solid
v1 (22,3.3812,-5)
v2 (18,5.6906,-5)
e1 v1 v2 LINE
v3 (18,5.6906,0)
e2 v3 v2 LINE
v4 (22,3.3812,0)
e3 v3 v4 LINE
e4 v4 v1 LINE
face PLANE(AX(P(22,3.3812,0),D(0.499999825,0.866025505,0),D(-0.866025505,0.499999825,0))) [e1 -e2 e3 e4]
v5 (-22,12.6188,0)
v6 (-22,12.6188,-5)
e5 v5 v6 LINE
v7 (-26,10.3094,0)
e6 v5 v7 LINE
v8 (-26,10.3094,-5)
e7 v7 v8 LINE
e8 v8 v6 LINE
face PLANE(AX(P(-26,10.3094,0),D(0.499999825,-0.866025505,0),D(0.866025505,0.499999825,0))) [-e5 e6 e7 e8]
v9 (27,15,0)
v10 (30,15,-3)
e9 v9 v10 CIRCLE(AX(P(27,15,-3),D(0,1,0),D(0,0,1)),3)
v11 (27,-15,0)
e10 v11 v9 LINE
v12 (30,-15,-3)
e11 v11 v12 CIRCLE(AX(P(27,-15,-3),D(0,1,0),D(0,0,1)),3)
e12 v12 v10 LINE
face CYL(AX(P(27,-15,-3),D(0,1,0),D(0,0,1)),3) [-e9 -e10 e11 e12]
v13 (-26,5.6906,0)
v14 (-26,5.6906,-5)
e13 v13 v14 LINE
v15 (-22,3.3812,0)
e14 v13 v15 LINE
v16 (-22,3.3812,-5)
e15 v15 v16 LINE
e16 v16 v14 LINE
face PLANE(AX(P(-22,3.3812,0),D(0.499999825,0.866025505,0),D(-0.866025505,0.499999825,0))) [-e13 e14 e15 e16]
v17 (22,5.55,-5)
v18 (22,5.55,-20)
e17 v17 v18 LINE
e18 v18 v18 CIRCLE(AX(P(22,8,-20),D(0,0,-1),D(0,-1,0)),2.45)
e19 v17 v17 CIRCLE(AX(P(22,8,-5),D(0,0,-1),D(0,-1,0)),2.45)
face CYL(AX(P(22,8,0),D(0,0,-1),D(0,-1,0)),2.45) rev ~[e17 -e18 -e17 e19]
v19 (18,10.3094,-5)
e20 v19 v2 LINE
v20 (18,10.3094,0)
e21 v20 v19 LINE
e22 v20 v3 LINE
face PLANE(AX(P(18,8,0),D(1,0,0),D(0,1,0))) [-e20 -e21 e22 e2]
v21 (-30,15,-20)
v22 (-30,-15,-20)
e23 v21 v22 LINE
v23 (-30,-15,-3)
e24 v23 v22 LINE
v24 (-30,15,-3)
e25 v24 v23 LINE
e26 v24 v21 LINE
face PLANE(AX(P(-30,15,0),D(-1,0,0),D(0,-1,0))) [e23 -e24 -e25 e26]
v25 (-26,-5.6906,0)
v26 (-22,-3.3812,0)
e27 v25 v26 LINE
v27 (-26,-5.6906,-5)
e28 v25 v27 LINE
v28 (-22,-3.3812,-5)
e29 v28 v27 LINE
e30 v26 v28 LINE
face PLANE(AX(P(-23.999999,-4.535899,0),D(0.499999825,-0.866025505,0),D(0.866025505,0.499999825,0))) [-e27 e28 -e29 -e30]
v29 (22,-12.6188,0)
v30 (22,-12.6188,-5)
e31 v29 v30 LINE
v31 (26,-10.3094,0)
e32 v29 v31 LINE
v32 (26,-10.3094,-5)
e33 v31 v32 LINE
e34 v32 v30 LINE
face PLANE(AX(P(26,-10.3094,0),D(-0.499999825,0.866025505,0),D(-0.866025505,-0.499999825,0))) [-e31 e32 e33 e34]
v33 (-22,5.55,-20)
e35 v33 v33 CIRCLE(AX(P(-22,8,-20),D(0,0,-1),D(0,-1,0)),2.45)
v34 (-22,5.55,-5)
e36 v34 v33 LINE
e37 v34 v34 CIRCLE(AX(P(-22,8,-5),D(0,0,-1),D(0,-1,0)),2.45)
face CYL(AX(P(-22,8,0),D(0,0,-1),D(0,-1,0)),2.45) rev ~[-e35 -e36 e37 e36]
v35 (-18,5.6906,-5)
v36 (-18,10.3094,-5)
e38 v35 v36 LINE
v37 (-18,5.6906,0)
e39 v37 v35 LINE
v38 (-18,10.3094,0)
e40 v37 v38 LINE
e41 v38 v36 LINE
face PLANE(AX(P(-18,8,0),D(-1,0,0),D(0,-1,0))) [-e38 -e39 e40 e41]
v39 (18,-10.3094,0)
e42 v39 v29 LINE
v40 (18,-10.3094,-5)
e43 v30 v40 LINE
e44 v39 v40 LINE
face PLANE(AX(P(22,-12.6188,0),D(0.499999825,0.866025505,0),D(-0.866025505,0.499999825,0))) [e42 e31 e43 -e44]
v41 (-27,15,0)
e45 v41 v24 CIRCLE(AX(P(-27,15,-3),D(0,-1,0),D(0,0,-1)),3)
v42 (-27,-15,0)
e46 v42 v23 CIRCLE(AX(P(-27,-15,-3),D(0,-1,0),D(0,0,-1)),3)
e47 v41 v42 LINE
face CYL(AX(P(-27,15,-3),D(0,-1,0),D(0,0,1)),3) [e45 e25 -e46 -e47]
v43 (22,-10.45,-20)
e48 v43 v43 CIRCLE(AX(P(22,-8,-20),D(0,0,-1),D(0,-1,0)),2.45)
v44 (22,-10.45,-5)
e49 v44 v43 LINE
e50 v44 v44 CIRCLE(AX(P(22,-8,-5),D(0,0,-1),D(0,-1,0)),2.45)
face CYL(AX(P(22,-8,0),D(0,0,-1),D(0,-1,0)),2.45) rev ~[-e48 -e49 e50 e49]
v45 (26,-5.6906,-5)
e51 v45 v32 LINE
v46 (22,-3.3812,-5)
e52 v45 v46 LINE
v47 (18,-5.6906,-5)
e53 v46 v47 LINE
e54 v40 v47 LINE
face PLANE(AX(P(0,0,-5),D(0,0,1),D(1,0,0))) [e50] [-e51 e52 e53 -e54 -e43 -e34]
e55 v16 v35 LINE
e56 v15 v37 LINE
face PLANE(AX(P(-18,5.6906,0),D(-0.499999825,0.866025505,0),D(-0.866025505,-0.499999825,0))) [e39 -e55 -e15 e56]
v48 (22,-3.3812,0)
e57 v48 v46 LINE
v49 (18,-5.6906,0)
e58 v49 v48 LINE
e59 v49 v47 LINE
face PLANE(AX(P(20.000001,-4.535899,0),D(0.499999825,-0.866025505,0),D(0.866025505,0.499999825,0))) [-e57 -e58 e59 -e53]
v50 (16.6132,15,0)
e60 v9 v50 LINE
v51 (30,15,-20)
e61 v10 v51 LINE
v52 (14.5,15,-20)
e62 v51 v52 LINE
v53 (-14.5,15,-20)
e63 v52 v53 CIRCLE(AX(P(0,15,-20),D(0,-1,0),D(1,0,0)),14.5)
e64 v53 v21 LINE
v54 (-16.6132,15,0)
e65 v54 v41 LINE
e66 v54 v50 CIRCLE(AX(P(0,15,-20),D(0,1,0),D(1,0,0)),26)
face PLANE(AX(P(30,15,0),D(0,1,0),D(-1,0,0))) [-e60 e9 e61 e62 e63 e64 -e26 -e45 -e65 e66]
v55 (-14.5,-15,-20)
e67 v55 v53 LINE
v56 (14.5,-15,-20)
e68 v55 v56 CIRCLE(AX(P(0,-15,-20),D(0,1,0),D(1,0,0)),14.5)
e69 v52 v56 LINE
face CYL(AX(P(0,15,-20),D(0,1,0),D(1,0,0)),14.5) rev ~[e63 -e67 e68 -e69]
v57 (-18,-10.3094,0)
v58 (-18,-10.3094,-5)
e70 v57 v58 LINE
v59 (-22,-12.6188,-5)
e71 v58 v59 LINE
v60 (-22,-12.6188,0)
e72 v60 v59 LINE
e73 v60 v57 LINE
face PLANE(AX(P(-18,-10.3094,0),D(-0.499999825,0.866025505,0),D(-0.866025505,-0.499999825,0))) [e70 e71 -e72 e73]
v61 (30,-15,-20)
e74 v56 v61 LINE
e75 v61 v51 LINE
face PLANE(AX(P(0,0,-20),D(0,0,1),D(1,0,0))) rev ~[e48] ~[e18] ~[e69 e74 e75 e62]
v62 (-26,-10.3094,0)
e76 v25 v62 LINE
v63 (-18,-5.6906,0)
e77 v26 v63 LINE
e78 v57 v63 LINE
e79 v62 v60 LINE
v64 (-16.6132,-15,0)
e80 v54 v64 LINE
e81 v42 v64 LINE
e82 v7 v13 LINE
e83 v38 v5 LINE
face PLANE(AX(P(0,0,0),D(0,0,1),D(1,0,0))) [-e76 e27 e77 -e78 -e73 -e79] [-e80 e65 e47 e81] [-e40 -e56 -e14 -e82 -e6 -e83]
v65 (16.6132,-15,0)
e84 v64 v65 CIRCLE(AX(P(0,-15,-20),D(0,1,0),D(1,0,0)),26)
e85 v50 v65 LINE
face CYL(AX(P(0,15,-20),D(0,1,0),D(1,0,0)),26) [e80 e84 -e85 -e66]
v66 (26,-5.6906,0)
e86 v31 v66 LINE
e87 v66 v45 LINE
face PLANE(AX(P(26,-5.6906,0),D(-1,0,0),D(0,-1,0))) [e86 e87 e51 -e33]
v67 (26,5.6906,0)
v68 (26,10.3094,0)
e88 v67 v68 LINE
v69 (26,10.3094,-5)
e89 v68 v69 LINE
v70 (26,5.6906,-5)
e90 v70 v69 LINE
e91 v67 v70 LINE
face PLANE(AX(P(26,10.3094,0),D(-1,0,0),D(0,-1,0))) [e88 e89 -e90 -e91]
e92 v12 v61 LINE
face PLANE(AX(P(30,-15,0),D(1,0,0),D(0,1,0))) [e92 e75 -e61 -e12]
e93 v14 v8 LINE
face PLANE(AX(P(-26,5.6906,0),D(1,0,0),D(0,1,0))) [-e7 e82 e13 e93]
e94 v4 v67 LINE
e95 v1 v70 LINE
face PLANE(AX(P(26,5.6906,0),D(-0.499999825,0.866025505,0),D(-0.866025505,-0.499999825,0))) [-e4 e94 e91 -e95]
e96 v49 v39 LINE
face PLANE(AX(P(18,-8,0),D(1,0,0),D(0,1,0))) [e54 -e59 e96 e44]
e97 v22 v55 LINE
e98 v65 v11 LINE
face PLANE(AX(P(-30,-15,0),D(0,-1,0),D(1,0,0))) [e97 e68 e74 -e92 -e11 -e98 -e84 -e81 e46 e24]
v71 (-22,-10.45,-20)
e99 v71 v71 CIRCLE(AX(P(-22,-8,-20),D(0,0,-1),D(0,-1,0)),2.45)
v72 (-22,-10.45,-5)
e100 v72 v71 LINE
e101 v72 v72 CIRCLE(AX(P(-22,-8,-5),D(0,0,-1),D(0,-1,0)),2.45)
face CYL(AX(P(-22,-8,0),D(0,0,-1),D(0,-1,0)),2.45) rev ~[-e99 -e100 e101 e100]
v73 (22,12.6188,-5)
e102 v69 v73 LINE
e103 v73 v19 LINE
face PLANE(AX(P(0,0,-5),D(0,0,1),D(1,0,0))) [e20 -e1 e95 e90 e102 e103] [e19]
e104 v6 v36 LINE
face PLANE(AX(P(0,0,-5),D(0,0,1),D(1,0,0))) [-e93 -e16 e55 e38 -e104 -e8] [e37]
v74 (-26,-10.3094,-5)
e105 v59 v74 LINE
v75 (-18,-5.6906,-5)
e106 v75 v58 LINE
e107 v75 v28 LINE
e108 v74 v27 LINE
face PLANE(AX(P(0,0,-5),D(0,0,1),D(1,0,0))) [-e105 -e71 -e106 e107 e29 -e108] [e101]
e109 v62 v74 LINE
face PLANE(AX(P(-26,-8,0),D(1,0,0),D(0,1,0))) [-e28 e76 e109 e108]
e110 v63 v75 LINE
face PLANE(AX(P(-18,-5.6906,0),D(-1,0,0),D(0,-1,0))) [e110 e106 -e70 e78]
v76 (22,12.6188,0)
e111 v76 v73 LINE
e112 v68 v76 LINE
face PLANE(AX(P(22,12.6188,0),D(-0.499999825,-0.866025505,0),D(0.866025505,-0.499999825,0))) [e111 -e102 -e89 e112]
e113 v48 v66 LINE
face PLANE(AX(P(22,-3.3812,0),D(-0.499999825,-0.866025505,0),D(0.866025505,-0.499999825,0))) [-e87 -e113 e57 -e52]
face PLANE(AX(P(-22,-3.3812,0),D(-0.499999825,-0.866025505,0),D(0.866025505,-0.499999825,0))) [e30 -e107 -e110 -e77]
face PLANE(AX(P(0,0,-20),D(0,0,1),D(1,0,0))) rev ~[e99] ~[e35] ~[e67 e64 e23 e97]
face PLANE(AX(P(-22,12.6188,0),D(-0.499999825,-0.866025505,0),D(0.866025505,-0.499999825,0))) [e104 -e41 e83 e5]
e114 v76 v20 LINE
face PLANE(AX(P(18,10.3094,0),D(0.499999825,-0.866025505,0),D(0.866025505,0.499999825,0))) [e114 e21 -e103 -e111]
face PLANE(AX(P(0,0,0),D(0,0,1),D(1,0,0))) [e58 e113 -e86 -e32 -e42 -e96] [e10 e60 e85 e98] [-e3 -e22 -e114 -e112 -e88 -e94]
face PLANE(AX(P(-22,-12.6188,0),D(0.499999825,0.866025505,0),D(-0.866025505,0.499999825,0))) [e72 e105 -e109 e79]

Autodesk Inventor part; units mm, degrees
ref_plane "YZ Plane" through (0, 0, 0) normal (1, 0, 0) x (0, 1, 0)
ref_plane "XZ Plane" through (0, 0, 0) normal (0, 1, 0) x (-1, 0, 0)
ref_plane "XY Plane" through (0, 0, 0) normal (0, 0, 1) x (1, 0, 0)
sketch "Schizzo1" plane through (0, 0, 0) normal (0, 0, 1) x (1, 0, 0)
  line L0 (-30, -15) -> (30, -15)
  line L1 (30, -15) -> (30, 15)
  line L2 (30, 15) -> (-30, 15)
  line L3 (-30, 15) -> (-30, -15)
  line L4 (-30, -15) -> (30, 15) construction
  line L5 (30, -15) -> (-30, 15) construction
  point P0 (0, 0)
  point P1 (0, 0)
  dimension "d27" = 30
  dimension "d28" = 60
extrude "Estrusione1" add sketch "Schizzo1" against normal blind 20
sketch "Schizzo2" plane through (-25, 15, 0) normal (0, 1, 0) x (1, 0, 0)
  line L0 (55, 20) -> (-5, 20) projected
  circle A0 centre (25, 20) radius 14.5
  point P0 (25, 0)
  dimension "d60" = 29
  dimension "d61" = 20
extrude "Estrusione2" cut sketch "Schizzo2" against normal blind 30
sketch "Schizzo6" plane through (0, 0, 0) normal (0, 0, 1) x (1, 0, 0)
  line L0 (0, 15) -> (0, 8)
  line L1 (0, 8) -> (-22, 8)
  line L2 (-22, 8) -> (-22, -8)
  line L3 (0, 8) -> (22, 8)
  line L4 (0, 8) -> (22, 8) construction
  line L5 (22, 8) -> (22, -8)
  point P0 (0, 0)
  dimension "d29" = 7
  dimension "d30" = 22
  dimension "d31" = 90
  dimension "d32" = 16
  dimension "d33" = 90
  dimension "d34" = 22
  dimension "d36" = 16
  dimension "d37" = 90
hole "Foro3" at (-22, 8, 0) at (-22, -8, 0) at (22, -8, 0) at (22, 8, 0) direction (0, 0, -1) diameter 4.9 end through all clearance for "Vite a testa piana" size "M4" standard "ANSI - Profilo M Metrico"
sketch "Schizzo7" plane through (0, 0, 0) normal (0, 0, 1) x (1, 0, 0)
  line L0 (-14.5, 15) -> (14.5, 15)
  line L1 (0, 15) -> (0, 8)
  line L2 (0, 8) -> (-22, 8)
  line L3 (-22, 8) -> (-22, -8)
  line L4 (0, 8) -> (22, 8)
  line L5 (0, 8) -> (22, 8) construction
  line L6 (22, 8) -> (22, -8)
  circle A0 centre (-22, -8) radius 4
  circle A1 centre (22, 8) radius 4
  circle A2 centre (22, -8) radius 4
  circle A3 centre (-22, 8) radius 4
  line L7 (-18, 5.6906) -> (-22, 3.3812)
  line L8 (-22, 3.3812) -> (-26, 5.6906)
  line L9 (-26, 5.6906) -> (-26, 10.3094)
  line L10 (-26, 10.3094) -> (-22, 12.6188)
  line L11 (-22, 12.6188) -> (-18, 10.3094)
  line L12 (-18, 10.3094) -> (-18, 5.6906)
  line L13 (-18, -10.3094) -> (-22, -12.6188)
  line L14 (-22, -12.6188) -> (-26, -10.3094)
  line L15 (-26, -10.3094) -> (-26, -5.6906)
  line L16 (-26, -5.6906) -> (-22, -3.3812)
  line L17 (-22, -3.3812) -> (-18, -5.6906)
  line L18 (-18, -5.6906) -> (-18, -10.3094)
  line L19 (26, -10.3094) -> (22, -12.6188)
  line L20 (22, -12.6188) -> (18, -10.3094)
  line L21 (18, -10.3094) -> (18, -5.6906)
  line L22 (18, -5.6906) -> (22, -3.3812)
  line L23 (22, -3.3812) -> (26, -5.6906)
  line L24 (26, -5.6906) -> (26, -10.3094)
  line L25 (26, 5.6906) -> (22, 3.3812)
  line L26 (22, 3.3812) -> (18, 5.6906)
  line L27 (18, 5.6906) -> (18, 10.3094)
  line L28 (18, 10.3094) -> (22, 12.6188)
  line L29 (22, 12.6188) -> (26, 10.3094)
  line L30 (26, 10.3094) -> (26, 5.6906)
  point P0 (0, 0)
  point P1 (0, 0)
  point P2 (-18, 8)
  point P3 (-18, -8)
  point P4 (26, -8)
  point P5 (26, 8)
  point P6 (-24, -11.4641)
  point P7 (-20, -11.4641)
  point P8 (-26, -8)
  point P9 (-24, -4.5359)
  point P10 (-20, -4.5359)
  dimension "d54" = 8
  dimension "d55" = 8
  dimension "d56" = 8
  dimension "d69" = 8
  dimension "d45" = 7
  dimension "d46" = 22
  dimension "d47" = 90
  dimension "d48" = 16
  dimension "d49" = 90
  dimension "d50" = 22
  dimension "d51" = 16
extrude "Estrusione4" cut sketch "Schizzo7" against normal blind 5
fillet "Raccordo1" radius 3 1 edges at (30, 0, 0)
fillet "Raccordo2" radius 3 1 edges at (-30, 0, 0)
sketch "Schizzo9" plane through (0, 15, -20) normal (0, 1, 0) x (1, 0, 0)
  circle A0 centre (0, 0) radius 26
  line L0 (27, -20) -> (-27, -20) projected
  line L1 (16.6132, -20) -> (-16.6132, -20)
  point P0 (0, -20)
  dimension "d66" = 52
extrude "Estrusione5" add sketch "Schizzo9" against normal blind 30 contours L0 A0 picked at (-3.8639, -21.091)
properties part number "3_Connettore_inf_INF" material "PLA(Stampato)(D0,646)"
